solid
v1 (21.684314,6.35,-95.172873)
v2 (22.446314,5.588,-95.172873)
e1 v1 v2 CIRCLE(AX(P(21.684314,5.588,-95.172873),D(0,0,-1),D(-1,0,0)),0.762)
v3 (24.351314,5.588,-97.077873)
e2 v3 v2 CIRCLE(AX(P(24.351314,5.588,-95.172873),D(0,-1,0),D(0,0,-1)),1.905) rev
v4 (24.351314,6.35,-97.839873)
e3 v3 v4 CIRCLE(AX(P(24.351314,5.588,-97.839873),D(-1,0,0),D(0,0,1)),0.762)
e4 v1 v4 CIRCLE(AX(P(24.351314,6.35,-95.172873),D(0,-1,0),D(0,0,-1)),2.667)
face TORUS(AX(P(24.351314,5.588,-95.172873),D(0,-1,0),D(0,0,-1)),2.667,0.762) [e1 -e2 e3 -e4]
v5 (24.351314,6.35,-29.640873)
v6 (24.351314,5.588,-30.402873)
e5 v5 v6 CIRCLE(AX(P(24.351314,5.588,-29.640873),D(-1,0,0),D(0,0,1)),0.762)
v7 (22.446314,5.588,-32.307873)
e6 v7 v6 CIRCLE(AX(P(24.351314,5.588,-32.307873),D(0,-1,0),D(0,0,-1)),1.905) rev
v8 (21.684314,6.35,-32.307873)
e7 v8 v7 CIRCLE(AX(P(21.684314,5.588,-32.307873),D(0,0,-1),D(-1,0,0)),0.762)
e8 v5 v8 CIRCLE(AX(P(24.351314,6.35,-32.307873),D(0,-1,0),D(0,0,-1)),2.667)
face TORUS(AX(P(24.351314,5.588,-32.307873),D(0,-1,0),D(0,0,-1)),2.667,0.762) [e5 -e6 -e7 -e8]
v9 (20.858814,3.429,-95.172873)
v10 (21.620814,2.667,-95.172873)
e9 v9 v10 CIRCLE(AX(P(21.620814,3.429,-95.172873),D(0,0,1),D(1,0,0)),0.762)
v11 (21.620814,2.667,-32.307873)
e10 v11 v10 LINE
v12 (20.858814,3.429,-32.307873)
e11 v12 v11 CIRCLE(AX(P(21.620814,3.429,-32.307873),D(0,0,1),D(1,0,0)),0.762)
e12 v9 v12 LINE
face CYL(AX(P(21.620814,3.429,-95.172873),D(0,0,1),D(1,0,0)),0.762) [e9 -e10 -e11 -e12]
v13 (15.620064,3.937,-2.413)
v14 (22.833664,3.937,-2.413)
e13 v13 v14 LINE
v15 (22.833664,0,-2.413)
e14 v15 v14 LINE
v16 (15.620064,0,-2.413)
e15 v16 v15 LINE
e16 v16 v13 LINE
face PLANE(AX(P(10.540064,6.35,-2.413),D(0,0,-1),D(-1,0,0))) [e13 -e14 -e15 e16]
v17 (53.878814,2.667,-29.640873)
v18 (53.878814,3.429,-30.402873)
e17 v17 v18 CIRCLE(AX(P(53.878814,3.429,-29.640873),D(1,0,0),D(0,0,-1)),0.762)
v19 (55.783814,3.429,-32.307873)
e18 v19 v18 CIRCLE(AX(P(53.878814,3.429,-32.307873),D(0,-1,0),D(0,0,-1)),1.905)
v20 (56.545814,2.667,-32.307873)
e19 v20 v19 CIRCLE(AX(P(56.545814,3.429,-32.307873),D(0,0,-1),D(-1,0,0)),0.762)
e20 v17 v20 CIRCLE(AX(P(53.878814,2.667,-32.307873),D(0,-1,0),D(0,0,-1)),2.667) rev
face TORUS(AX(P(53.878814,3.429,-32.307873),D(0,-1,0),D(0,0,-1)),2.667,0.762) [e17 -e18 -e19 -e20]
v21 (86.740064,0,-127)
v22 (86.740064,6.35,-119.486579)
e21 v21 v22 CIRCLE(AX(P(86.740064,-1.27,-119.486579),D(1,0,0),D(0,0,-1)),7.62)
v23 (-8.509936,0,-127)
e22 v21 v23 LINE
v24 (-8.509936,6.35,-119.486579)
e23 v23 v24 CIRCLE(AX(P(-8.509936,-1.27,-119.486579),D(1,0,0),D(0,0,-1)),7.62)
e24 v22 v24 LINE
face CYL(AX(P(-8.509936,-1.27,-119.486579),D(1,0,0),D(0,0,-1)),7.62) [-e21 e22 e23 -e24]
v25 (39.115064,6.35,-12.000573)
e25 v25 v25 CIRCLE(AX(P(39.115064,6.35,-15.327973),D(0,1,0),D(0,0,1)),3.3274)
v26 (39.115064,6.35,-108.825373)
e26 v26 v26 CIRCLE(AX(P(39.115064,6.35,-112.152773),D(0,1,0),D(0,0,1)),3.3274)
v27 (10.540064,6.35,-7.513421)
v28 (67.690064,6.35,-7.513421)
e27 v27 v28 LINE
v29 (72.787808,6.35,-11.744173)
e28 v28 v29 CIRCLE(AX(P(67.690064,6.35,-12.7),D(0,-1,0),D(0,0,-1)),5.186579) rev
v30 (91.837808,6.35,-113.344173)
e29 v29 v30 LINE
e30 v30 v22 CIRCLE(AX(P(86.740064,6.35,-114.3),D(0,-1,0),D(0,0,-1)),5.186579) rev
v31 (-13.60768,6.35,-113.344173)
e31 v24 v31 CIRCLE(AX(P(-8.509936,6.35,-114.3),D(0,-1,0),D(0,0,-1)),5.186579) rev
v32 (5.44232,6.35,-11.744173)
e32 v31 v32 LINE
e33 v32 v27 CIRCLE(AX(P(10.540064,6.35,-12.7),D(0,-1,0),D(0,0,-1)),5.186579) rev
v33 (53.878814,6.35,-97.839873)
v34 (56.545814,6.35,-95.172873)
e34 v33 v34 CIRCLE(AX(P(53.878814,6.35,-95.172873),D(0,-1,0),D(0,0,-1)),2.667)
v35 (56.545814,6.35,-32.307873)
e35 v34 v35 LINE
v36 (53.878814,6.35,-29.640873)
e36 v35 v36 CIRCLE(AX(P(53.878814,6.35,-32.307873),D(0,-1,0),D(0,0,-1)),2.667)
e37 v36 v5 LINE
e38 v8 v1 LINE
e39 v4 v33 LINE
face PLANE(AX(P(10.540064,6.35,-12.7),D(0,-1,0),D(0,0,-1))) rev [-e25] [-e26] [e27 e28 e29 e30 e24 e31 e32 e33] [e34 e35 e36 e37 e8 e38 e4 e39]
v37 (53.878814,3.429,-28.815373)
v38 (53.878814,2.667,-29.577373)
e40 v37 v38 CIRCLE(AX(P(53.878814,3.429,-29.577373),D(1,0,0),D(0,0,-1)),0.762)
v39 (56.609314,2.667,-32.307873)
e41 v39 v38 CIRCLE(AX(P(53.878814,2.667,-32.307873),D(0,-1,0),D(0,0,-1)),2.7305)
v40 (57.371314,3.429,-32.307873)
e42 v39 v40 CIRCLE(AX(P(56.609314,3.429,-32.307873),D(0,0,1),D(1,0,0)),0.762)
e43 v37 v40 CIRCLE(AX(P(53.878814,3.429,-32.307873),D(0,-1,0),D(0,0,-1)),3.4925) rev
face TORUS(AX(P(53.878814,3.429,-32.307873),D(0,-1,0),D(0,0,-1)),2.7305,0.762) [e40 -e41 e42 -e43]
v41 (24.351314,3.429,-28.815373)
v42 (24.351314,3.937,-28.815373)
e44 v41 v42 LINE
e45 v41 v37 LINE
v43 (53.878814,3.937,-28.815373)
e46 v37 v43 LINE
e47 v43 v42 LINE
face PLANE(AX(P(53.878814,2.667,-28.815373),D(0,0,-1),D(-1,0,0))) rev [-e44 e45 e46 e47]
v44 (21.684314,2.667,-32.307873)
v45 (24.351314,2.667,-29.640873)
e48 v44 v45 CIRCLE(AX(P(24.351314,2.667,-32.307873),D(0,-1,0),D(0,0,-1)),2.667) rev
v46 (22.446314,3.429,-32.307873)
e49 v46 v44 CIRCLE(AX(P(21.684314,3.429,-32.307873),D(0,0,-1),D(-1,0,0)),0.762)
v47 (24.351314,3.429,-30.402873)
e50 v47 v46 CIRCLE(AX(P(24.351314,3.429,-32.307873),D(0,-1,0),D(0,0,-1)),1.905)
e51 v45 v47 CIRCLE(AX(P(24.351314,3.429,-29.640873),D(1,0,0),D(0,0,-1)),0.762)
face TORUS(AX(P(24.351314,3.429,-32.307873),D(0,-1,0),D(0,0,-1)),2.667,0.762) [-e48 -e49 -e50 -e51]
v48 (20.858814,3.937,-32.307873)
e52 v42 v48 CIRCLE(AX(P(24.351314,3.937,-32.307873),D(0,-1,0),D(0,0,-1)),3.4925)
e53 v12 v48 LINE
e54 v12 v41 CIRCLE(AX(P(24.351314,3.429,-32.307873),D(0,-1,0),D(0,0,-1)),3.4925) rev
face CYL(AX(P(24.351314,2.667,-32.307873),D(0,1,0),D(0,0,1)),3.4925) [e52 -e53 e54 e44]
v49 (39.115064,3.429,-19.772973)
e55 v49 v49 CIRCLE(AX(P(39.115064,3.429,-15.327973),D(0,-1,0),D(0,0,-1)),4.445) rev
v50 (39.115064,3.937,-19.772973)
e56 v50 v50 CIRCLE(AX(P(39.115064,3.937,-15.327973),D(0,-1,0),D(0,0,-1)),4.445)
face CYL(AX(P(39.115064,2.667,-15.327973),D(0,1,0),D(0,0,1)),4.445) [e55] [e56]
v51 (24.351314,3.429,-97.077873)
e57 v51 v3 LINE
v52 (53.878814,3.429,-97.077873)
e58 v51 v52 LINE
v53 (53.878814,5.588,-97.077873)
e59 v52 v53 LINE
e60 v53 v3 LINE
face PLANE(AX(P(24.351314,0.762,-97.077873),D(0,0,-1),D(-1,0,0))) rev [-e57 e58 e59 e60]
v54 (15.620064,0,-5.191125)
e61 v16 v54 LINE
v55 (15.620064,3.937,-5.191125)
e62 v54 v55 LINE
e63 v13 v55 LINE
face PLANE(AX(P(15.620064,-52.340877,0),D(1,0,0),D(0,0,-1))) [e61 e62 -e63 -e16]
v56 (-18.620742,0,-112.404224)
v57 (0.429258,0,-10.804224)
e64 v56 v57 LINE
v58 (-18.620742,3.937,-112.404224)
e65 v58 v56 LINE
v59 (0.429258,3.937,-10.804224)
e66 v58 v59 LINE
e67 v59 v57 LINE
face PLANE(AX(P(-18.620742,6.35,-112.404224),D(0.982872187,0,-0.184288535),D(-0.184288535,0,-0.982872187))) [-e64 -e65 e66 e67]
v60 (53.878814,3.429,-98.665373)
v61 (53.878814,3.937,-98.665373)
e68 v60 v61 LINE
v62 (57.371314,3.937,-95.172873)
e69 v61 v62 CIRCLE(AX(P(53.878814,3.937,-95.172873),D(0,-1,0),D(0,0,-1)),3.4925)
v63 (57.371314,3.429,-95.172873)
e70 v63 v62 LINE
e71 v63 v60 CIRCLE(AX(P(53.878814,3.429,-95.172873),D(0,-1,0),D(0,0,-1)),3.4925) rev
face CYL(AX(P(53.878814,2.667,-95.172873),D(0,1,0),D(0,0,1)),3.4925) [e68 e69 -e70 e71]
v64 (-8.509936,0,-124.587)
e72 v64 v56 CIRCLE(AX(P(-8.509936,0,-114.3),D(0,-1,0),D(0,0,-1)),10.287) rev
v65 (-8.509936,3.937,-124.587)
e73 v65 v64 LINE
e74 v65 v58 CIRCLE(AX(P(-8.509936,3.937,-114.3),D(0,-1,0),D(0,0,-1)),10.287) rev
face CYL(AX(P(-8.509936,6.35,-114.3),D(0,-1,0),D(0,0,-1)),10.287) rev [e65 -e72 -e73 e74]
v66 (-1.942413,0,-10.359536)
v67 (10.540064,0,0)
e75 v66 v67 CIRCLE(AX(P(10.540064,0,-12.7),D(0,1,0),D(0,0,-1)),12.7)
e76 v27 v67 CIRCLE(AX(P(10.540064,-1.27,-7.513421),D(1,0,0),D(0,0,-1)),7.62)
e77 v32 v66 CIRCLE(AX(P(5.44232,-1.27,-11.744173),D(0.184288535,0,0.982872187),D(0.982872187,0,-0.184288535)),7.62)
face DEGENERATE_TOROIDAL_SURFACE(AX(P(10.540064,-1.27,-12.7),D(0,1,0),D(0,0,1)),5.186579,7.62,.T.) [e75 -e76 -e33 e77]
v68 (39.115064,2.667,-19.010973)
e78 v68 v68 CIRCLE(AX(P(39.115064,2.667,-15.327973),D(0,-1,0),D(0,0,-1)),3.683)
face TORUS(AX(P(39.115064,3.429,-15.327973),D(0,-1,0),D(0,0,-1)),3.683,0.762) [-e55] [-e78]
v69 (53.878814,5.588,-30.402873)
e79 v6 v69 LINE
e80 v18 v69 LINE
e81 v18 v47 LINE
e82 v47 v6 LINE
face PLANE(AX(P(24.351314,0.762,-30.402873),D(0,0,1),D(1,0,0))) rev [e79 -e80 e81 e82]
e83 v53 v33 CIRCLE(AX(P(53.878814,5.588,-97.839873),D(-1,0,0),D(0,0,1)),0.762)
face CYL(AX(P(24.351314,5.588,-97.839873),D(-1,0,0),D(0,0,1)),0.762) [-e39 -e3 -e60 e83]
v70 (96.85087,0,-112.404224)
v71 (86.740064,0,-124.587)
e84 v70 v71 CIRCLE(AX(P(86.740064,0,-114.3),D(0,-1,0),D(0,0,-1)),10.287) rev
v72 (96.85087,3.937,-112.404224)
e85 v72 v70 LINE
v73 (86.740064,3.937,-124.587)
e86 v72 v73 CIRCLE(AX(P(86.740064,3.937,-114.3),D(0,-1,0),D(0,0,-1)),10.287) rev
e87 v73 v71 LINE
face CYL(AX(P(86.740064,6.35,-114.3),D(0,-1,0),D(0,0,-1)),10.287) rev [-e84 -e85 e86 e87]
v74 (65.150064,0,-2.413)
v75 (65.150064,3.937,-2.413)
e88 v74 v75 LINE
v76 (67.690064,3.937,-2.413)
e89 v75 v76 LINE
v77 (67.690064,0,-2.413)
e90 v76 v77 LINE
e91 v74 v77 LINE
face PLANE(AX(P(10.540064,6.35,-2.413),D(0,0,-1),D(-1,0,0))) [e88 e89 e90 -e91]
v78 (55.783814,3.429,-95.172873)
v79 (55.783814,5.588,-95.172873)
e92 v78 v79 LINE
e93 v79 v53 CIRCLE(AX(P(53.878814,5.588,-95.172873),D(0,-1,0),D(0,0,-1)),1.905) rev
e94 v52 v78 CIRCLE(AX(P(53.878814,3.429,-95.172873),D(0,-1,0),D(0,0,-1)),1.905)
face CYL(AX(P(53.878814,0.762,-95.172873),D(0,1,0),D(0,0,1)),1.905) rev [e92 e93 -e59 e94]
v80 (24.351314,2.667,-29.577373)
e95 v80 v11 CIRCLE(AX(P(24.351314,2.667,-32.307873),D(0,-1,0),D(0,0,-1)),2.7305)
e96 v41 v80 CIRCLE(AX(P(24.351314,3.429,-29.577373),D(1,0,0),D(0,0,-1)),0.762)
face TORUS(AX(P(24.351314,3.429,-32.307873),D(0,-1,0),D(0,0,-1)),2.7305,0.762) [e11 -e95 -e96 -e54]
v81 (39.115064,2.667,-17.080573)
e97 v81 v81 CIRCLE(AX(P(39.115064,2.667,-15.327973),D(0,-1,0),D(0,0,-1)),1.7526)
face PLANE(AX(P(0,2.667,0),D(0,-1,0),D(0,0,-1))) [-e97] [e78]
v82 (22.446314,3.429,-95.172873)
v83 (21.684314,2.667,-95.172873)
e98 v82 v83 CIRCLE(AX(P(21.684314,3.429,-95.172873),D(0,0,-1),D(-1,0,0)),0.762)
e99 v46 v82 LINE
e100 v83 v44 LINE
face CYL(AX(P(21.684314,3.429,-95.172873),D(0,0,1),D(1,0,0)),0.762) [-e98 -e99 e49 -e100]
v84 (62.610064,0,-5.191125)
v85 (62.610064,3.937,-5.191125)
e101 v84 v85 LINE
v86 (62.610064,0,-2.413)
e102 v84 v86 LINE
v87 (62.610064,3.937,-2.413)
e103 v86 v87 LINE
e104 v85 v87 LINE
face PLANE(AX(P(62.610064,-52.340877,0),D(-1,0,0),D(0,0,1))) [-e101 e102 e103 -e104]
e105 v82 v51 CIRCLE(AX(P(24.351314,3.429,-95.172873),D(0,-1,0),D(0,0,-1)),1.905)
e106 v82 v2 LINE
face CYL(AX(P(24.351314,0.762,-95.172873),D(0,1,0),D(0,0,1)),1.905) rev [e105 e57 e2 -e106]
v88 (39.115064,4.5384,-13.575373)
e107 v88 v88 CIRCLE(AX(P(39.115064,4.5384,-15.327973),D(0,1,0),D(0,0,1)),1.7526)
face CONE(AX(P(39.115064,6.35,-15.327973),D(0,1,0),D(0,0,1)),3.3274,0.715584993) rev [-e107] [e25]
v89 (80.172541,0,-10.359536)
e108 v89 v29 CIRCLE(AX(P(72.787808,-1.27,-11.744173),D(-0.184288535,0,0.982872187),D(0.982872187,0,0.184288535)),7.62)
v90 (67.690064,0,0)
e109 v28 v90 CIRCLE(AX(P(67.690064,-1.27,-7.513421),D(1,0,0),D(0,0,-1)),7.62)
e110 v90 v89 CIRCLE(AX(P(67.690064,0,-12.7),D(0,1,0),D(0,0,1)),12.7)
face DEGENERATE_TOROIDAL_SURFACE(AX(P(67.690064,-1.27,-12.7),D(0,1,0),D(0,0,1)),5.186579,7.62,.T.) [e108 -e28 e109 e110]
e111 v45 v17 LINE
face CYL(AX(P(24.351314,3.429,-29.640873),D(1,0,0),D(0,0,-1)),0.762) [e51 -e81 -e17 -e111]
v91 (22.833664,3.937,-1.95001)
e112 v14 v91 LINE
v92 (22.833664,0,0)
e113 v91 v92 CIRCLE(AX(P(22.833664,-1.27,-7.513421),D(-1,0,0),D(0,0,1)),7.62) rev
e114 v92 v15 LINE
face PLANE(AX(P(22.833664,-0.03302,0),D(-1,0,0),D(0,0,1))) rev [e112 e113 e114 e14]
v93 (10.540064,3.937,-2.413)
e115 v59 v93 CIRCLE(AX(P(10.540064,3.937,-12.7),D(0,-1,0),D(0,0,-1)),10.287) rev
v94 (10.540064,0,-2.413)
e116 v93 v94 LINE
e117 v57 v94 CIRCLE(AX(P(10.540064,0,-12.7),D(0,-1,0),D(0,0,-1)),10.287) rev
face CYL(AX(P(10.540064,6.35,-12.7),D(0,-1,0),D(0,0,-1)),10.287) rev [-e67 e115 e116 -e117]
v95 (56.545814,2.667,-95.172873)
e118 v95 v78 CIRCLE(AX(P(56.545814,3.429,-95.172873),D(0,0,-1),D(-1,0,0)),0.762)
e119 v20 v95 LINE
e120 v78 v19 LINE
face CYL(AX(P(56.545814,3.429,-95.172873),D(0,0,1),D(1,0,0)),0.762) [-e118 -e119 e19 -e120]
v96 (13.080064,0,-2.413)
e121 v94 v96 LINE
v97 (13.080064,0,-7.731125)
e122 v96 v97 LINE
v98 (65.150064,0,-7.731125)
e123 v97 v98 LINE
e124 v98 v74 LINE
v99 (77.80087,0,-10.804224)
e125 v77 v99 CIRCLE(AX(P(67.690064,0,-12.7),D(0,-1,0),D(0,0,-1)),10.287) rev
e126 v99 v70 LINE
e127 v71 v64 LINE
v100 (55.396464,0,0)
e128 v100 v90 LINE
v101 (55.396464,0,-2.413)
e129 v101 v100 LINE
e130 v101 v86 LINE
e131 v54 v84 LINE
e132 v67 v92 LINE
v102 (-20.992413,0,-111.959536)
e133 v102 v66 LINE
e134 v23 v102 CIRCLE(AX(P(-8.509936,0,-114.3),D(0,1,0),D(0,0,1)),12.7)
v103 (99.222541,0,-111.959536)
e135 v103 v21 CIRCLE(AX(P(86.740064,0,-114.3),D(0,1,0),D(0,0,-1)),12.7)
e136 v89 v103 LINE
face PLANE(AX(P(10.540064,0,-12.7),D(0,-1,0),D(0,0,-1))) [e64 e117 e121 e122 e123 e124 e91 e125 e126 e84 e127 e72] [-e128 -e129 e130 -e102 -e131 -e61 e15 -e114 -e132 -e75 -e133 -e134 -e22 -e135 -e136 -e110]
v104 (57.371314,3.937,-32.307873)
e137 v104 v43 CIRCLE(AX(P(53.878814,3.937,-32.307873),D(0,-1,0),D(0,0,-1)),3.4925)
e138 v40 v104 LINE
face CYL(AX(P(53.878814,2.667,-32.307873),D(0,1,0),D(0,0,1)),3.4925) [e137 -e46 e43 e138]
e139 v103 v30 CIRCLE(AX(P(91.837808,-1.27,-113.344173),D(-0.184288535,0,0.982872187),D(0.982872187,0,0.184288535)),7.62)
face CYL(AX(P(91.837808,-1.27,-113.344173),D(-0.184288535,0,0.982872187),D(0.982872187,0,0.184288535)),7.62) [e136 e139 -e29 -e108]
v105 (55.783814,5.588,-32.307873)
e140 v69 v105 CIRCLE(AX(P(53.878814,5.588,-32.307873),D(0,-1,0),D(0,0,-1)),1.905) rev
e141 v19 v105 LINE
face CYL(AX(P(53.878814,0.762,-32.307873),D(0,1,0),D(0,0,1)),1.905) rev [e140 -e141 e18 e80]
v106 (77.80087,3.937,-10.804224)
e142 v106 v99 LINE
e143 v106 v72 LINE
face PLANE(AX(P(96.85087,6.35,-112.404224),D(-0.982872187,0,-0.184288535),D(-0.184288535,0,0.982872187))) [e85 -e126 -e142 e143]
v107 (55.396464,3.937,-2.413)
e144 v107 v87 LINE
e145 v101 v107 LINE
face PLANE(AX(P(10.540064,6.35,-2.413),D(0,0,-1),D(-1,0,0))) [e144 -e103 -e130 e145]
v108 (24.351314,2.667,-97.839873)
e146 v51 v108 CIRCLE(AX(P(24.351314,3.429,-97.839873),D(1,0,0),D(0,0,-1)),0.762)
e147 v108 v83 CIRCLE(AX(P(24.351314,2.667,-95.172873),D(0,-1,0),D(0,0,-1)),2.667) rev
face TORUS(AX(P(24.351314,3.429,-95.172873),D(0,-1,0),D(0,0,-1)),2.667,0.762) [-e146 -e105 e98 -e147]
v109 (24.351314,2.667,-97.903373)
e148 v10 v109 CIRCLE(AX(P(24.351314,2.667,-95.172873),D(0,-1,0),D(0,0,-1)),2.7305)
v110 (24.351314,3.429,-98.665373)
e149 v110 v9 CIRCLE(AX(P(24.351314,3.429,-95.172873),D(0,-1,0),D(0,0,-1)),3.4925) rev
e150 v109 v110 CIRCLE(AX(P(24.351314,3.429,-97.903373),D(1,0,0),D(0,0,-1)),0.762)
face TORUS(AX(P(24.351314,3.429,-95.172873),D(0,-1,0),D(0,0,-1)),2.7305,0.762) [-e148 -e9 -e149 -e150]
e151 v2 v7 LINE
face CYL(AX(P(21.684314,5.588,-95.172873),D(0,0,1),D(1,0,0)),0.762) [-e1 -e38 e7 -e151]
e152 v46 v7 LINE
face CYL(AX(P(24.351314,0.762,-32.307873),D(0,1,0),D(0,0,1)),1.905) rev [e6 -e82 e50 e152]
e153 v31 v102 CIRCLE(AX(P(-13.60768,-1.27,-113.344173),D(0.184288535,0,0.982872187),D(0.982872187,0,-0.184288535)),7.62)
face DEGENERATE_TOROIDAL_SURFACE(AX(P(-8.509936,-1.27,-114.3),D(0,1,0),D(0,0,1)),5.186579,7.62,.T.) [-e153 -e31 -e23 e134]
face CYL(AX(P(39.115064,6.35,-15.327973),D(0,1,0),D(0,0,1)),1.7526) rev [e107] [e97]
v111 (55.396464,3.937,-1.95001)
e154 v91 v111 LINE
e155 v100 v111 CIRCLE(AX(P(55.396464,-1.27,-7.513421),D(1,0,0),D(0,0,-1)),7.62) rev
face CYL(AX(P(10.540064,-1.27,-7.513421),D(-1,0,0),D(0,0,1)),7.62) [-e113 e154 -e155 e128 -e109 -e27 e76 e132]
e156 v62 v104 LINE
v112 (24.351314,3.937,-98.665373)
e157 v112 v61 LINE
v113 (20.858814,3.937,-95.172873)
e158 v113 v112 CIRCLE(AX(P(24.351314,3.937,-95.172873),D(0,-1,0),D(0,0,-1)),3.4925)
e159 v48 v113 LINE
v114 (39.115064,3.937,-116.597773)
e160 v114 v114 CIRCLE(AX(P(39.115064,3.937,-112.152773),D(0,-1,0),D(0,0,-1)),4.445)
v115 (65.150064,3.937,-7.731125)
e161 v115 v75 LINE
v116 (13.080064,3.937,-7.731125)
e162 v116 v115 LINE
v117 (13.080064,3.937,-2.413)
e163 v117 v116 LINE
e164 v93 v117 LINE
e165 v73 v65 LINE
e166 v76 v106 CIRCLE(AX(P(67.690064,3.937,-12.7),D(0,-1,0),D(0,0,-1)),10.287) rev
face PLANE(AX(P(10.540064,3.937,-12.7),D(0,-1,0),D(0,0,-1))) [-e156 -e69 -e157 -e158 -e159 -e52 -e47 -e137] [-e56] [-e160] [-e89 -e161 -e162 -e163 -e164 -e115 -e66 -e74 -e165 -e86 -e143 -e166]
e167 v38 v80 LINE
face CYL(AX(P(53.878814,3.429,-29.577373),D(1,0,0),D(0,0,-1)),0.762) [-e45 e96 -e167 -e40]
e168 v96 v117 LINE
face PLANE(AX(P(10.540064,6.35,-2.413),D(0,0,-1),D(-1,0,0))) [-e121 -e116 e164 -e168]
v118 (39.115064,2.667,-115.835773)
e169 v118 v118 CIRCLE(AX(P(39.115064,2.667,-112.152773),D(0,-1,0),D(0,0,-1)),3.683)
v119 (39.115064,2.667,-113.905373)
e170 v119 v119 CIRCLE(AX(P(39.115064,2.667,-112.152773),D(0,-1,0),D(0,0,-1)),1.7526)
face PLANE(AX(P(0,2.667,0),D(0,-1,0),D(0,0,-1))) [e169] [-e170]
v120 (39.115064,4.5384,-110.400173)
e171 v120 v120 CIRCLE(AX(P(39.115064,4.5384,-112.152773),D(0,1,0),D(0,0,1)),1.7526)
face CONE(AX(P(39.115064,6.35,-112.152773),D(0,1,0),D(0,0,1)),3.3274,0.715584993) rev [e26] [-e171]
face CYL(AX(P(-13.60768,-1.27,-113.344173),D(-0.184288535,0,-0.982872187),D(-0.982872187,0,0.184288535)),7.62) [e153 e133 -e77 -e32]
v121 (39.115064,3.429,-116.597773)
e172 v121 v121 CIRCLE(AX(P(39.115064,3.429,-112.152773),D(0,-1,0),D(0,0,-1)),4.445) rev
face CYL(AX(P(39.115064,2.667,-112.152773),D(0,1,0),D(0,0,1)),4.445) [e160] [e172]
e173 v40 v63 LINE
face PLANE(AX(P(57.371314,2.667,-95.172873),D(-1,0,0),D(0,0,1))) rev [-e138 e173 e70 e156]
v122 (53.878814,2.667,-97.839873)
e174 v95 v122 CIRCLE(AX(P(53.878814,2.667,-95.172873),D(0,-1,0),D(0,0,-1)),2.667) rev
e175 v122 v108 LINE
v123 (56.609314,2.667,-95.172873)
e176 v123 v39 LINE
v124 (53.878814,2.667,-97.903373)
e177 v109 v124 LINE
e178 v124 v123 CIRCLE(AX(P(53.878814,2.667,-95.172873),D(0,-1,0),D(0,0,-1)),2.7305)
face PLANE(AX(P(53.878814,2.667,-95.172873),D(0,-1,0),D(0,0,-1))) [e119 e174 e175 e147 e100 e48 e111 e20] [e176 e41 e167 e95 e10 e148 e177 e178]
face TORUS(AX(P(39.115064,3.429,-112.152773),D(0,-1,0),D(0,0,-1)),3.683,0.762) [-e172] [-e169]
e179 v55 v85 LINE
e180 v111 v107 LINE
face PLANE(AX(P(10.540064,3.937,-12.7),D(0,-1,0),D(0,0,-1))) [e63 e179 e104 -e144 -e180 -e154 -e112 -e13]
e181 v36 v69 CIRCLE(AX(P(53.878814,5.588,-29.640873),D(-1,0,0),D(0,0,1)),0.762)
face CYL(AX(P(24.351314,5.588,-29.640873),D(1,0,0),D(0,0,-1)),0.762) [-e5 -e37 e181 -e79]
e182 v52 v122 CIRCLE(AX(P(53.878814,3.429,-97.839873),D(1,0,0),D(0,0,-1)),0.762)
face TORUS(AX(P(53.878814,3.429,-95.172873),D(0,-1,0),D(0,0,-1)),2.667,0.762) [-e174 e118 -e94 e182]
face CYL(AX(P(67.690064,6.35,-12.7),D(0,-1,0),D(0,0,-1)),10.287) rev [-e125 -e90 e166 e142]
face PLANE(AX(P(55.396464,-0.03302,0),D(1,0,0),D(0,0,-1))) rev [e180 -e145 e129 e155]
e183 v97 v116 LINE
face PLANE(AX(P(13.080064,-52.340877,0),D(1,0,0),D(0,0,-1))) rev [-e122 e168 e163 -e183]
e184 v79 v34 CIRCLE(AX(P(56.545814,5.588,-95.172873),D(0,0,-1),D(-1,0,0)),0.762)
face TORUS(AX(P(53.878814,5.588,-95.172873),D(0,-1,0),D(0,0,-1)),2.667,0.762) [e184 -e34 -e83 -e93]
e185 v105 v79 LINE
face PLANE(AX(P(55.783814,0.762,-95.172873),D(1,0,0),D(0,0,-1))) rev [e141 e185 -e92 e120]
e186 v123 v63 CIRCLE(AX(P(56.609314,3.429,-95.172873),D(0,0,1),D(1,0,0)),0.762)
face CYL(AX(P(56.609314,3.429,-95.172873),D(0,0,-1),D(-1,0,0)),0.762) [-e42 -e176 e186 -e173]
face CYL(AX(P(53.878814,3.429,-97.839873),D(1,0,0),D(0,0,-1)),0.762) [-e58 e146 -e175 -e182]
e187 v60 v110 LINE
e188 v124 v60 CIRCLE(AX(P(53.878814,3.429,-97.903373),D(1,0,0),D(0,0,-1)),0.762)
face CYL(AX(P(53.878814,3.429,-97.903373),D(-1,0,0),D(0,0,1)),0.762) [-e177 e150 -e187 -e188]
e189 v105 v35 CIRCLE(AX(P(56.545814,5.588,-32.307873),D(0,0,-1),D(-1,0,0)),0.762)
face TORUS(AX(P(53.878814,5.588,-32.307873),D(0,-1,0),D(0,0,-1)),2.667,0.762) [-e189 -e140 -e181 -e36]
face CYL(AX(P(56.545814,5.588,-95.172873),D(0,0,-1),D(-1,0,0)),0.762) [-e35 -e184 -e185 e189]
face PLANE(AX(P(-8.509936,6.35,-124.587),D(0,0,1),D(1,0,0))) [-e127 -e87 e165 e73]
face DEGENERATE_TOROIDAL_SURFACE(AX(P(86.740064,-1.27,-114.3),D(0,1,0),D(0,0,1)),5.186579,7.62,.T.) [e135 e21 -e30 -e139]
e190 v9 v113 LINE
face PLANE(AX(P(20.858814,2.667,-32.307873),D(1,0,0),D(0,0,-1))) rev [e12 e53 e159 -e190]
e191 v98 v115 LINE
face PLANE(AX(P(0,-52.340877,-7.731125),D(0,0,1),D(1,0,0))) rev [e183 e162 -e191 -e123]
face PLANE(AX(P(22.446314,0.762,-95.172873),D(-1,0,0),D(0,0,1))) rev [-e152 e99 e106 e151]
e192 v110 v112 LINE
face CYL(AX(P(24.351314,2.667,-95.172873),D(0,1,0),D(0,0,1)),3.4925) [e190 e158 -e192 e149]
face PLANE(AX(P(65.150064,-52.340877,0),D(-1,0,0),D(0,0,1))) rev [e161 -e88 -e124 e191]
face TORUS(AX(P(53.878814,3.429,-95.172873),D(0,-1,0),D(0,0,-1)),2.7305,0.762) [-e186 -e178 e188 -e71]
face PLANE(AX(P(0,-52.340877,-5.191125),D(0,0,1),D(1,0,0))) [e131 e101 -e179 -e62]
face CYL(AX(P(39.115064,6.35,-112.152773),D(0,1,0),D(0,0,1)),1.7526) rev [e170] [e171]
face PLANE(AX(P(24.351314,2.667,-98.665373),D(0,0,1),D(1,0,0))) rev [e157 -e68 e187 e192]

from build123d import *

# Parameters (mm, degrees)
BOSS_EXTRUDE1_DEPTH                               = 6.35
SHELL1_T                                          = -2.413
FILLET1_R                                         = 7.62
SKETCH4_R                                         = 4.445
BOSS_EXTRUDE2_DEPTH                               = 1.27
CSK_FOR_3_FLAT_HEAD_MACHINE_SCREW_100_D           = 3.5052
CSK_FOR_3_FLAT_HEAD_MACHINE_SCREW_100_CSINK_D     = 6.6548
CSK_FOR_3_FLAT_HEAD_MACHINE_SCREW_100_CSINK_ANGLE = 82
CUT_EXTRUDE3_DEPTH                                = 5.588
SKETCH9_W                                         = 32.5628
SKETCH9_H                                         = 2.413
CUT_EXTRUDE4_DEPTH                                = 3.97002
BOSS_EXTRUDE3_DEPTH                               = 3.937
BOSS_EXTRUDE4_DEPTH                               = 1.27
CUT_EXTRUDE5_DEPTH                                = 162.42381732
FILLET2_R                                         = 0.762


with BuildPart() as part:
    # Sketch1 → Boss-Extrude1 (new body)
    with BuildSketch(Plane(origin=(0, 0, 0), x_dir=(1, 0, 0), z_dir=(0, 1, 0))):
        with BuildLine():
            Line((-20.992412926, 111.959535605), (-1.942412926, 10.359535605))
            ThreePointArc((-1.942412926, 10.359535605), (2.429388717, 2.927234327), (10.540063848, 0))
            Line((10.540063848, 0), (67.690063848, 0))
            ThreePointArc((67.690063848, 0), (75.80073898, 2.927234327), (80.172540622, 10.359535605))
            Line((80.172540622, 10.359535605), (99.222540622, 111.959535605))
            ThreePointArc((99.222540622, 111.959535605), (96.512829522, 122.410675132), (86.740063848, 127))
            Line((86.740063848, 127), (-8.509936152, 127))
            ThreePointArc((-8.509936152, 127), (-18.282701825, 122.410675132), (-20.992412926, 111.959535605))
        make_face()
    extrude(amount=BOSS_EXTRUDE1_DEPTH)

    # Shell1
    shell1_openings = [part.faces().sort_by_distance(p)[0] for p in [
        (39.115063848, 0, -68.214548016),
    ]]
    offset(amount=SHELL1_T, openings=shell1_openings, kind=Kind.INTERSECTION)

    # Fillet1
    # the kernel refuses this fillet: 7.62 mm, written as the material it takes off along each edge
    with BuildSketch(Plane(origin=(67.690063848, 6.35, -12.7), x_dir=(0, 0, 1), z_dir=(-1, 0, 0))) as fillet1_piece_1:
        with BuildLine():
            CenterArc((5.186578675, -7.62), FILLET1_R, 9.594068227, 80.405931773)
            Line((5.186578675, 0), (5.186578675, 0.1524))
            Line((5.186578675, 0.1524), (12.7, 0.1524))
            Line((12.7, 0.1524), (12.8524, 0))
            ThreePointArc((12.8524, 0), (12.8524, -3.175), (12.850268426, -6.3246))
            Line((12.850268426, -6.3246), (12.7, -6.35))
        make_face()
    revolve(axis=Axis((67.690063848, 6.35, -12.7), (0, 1, 0)), revolution_arc=79.380344724, mode=Mode.SUBTRACT)
    with BuildSketch(Plane(origin=(10.540063848, 6.35, 0), x_dir=(0, -1, 0), z_dir=(1, 0, 0))) as fillet1_piece_2:
        with BuildLine():
            CenterArc((7.62, 7.513421325), FILLET1_R, 180, 80.405931773)
            Line((0, 7.513421325), (-0.1524, 7.513421325))
            Line((-0.1524, 7.513421325), (-0.1524, 0))
            Line((-0.1524, 0), (0, -0.1524))
            ThreePointArc((0, -0.1524), (3.175, -0.1524), (6.3246, -0.150268426))
            Line((6.3246, -0.150268426), (6.35, 0))
        make_face()
    extrude(amount=57.15, mode=Mode.SUBTRACT)
    with BuildSketch(Plane(origin=(10.540063848, 6.35, -12.7), x_dir=(-0.9828721869343217, 0, 0.18428853505018647), z_dir=(-0.18428853505018647, 0, -0.9828721869343217))) as fillet1_piece_3:
        with BuildLine():
            CenterArc((5.186578675, -7.62), FILLET1_R, 9.594068227, 80.405931773)
            Line((5.186578675, 0), (5.186578675, 0.1524))
            Line((5.186578675, 0.1524), (12.7, 0.1524))
            Line((12.7, 0.1524), (12.8524, 0))
            ThreePointArc((12.8524, 0), (12.8524, -3.175), (12.850268426, -6.3246))
            Line((12.850268426, -6.3246), (12.7, -6.35))
        make_face()
    revolve(axis=Axis((10.540063848, 6.35, -12.7), (0, 1, 0)), revolution_arc=79.380344724, mode=Mode.SUBTRACT)
    with BuildSketch(Plane(origin=(-20.992412926, 6.35, -111.959535605), x_dir=(0, -1, 0), z_dir=(0.18428853505018555, 0, 0.982872186934322)), Plane(origin=(80.172540622, 6.35, -10.359535605), x_dir=(0, -1, 0), z_dir=(0.18428853505018533, 0, -0.982872186934322))) as fillet1_piece_4:
        with BuildLine():
            CenterArc((7.62, 7.513421325), FILLET1_R, 180, 80.405931773)
            Line((0, 7.513421325), (-0.1524, 7.513421325))
            Line((-0.1524, 7.513421325), (-0.1524, 0))
            Line((-0.1524, 0), (0, -0.1524))
            ThreePointArc((0, -0.1524), (3.175, -0.1524), (6.3246, -0.150268426))
            Line((6.3246, -0.150268426), (6.35, 0))
        make_face()
    extrude(amount=103.370510785, mode=Mode.SUBTRACT)
    with BuildSketch(Plane(origin=(-8.509936152, 6.35, -114.3), x_dir=(0, 0, -1), z_dir=(1, 0, 0))) as fillet1_piece_5:
        with BuildLine():
            CenterArc((5.186578675, -7.62), FILLET1_R, 9.594068227, 80.405931773)
            Line((5.186578675, 0), (5.186578675, 0.1524))
            Line((5.186578675, 0.1524), (12.7, 0.1524))
            Line((12.7, 0.1524), (12.8524, 0))
            ThreePointArc((12.8524, 0), (12.8524, -3.175), (12.850268426, -6.3246))
            Line((12.850268426, -6.3246), (12.7, -6.35))
        make_face()
    revolve(axis=Axis((-8.509936152, 6.35, -114.3), (0, 1, 0)), revolution_arc=100.619655276, mode=Mode.SUBTRACT)
    with BuildSketch(Plane(origin=(86.740063848, 6.35, -127), x_dir=(0, -1, 0), z_dir=(-1, 0, 0))) as fillet1_piece_6:
        with BuildLine():
            CenterArc((7.62, 7.513421325), FILLET1_R, 180, 80.405931773)
            Line((0, 7.513421325), (-0.1524, 7.513421325))
            Line((-0.1524, 7.513421325), (-0.1524, 0))
            Line((-0.1524, 0), (0, -0.1524))
            ThreePointArc((0, -0.1524), (3.175, -0.1524), (6.3246, -0.150268426))
            Line((6.3246, -0.150268426), (6.35, 0))
        make_face()
    extrude(amount=95.25, mode=Mode.SUBTRACT)
    with BuildSketch(Plane(origin=(86.740063848, 6.35, -114.3), x_dir=(0.9828721869343223, 0, 0.18428853505018347), z_dir=(-0.18428853505018347, 0, 0.9828721869343223))) as fillet1_piece_7:
        with BuildLine():
            CenterArc((5.186578675, -7.62), FILLET1_R, 9.594068227, 80.405931773)
            Line((5.186578675, 0), (5.186578675, 0.1524))
            Line((5.186578675, 0.1524), (12.7, 0.1524))
            Line((12.7, 0.1524), (12.8524, 0))
            ThreePointArc((12.8524, 0), (12.8524, -3.175), (12.850268426, -6.3246))
            Line((12.850268426, -6.3246), (12.7, -6.35))
        make_face()
    revolve(axis=Axis((86.740063848, 6.35, -114.3), (0, 1, 0)), revolution_arc=100.619655276, mode=Mode.SUBTRACT)

    # Sketch4 → Boss-Extrude2 (add)
    with BuildSketch(Plane.XZ.offset(-3.937)):
        with Locations(Location((39.115063848, -112.152772571, 0), (0, 0, 270))):
            Circle(SKETCH4_R)
        with Locations(Location((39.115063848, -15.327972571, 0), (0, 0, 270))):
            Circle(SKETCH4_R)
    extrude(amount=BOSS_EXTRUDE2_DEPTH)

    # CSK for #3 Flat Head Machine Screw (100)1 (through all)
    with Locations(Plane(origin=(39.115063848, 6.35, -112.152772571), x_dir=(0, 0, 1), z_dir=(0, 1, 0))):
        with Locations((0, 0), (96.8248, 0)):
            CounterSinkHole(CSK_FOR_3_FLAT_HEAD_MACHINE_SCREW_100_D / 2, CSK_FOR_3_FLAT_HEAD_MACHINE_SCREW_100_CSINK_D / 2, counter_sink_angle=CSK_FOR_3_FLAT_HEAD_MACHINE_SCREW_100_CSINK_ANGLE)

    # Sketch8 → Cut-Extrude3 (cut)
    with BuildSketch(Plane(origin=(0, 6.35, 0), x_dir=(1, 0, 0), z_dir=(0, 1, 0))):
        with BuildLine():
            Line((24.351313848, 97.077872571), (53.878813848, 97.077872571))
            ThreePointArc((53.878813848, 97.077872571), (55.225852266, 96.519910989), (55.783813848, 95.172872571))
            Line((55.783813848, 95.172872571), (55.783813848, 32.307872571))
            ThreePointArc((55.783813848, 32.307872571), (55.225852266, 30.960834153), (53.878813848, 30.402872571))
            Line((53.878813848, 30.402872571), (24.351313848, 30.402872571))
            ThreePointArc((24.351313848, 30.402872571), (23.00427543, 30.960834153), (22.446313848, 32.307872571))
            Line((22.446313848, 32.307872571), (22.446313848, 95.172872571))
            ThreePointArc((22.446313848, 95.172872571), (23.00427543, 96.519910989), (24.351313848, 97.077872571))
        make_face()
    extrude(amount=-CUT_EXTRUDE3_DEPTH, mode=Mode.SUBTRACT)

    # Sketch9 → Cut-Extrude4 (cut)
    with BuildSketch(Plane.XZ.offset(-3.937)):
        with Locations((39.115063848, -1.2065)):
            Rectangle(SKETCH9_W, SKETCH9_H)
    extrude(amount=CUT_EXTRUDE4_DEPTH, mode=Mode.SUBTRACT)

    # Sketch9<3> → Boss-Extrude3 (add)
    with BuildSketch(Plane.XZ.offset(-3.937)):
        Polygon((15.620063848, -2.413), (13.080063848, -2.413), (13.080063848, -7.731125), (39.115063848, -7.731125), (39.115063848, -5.191125), (15.620063848, -5.191125), align=None)
        Polygon((39.115063848, -5.191125), (39.115063848, -7.731125), (65.150063848, -7.731125), (65.150063848, -2.413), (62.610063848, -2.413), (62.610063848, -5.191125), align=None)
    extrude(amount=BOSS_EXTRUDE3_DEPTH)

    # Sketch10 → Boss-Extrude4 (add)
    with BuildSketch(Plane.XZ.offset(-3.937)):
        with BuildLine():
            Line((57.371313848, -95.172872571), (57.371313848, -32.307872571))
            ThreePointArc((57.371313848, -32.307872571), (56.348384281, -29.838302138), (53.878813848, -28.815372571))
            Line((53.878813848, -28.815372571), (24.351313848, -28.815372571))
            ThreePointArc((24.351313848, -28.815372571), (21.881743415, -29.838302138), (20.858813848, -32.307872571))
            Line((20.858813848, -32.307872571), (20.858813848, -95.172872571))
            ThreePointArc((20.858813848, -95.172872571), (21.881743415, -97.642443004), (24.351313848, -98.665372571))
            Line((24.351313848, -98.665372571), (53.878813848, -98.665372571))
            ThreePointArc((53.878813848, -98.665372571), (56.348384281, -97.642443004), (57.371313848, -95.172872571))
        make_face()
    extrude(amount=BOSS_EXTRUDE4_DEPTH)

    # Sketch8<3> → Cut-Extrude5 (cut, through all)
    with BuildSketch(Plane(origin=(0, 6.35, 0), x_dir=(1, 0, 0), z_dir=(0, 1, 0))):
        with BuildLine():
            Line((24.351313848, 97.077872571), (53.878813848, 97.077872571))
            ThreePointArc((53.878813848, 97.077872571), (55.225852266, 96.519910989), (55.783813848, 95.172872571))
            Line((55.783813848, 95.172872571), (55.783813848, 32.307872571))
            ThreePointArc((55.783813848, 32.307872571), (55.225852266, 30.960834153), (53.878813848, 30.402872571))
            Line((53.878813848, 30.402872571), (24.351313848, 30.402872571))
            ThreePointArc((24.351313848, 30.402872571), (23.00427543, 30.960834153), (22.446313848, 32.307872571))
            Line((22.446313848, 32.307872571), (22.446313848, 95.172872571))
            ThreePointArc((22.446313848, 95.172872571), (23.00427543, 96.519910989), (24.351313848, 97.077872571))
        make_face()
    extrude(amount=-CUT_EXTRUDE5_DEPTH, mode=Mode.SUBTRACT)

    # Fillet2
    fillet2_edges = [part.edges().sort_by_distance(p)[0] for p in [
        (56.348384281, 2.667, -97.642443004),
        (57.371313848, 2.667, -63.740372571),
        (56.348384281, 2.667, -29.838302138),
        (39.115063848, 2.667, -28.815372571),
        (21.881743415, 2.667, -29.838302138),
        (20.858813848, 2.667, -63.740372571),
        (21.881743415, 2.667, -97.642443004),
        (39.115063848, 2.667, -98.665372571),
        (39.115063848, 2.667, -30.402872571),
        (55.225852266, 2.667, -30.960834153),
        (55.783813848, 2.667, -63.740372571),
        (55.225852266, 2.667, -96.519910989),
        (39.115063848, 2.667, -97.077872571),
        (23.00427543, 2.667, -96.519910989),
        (22.446313848, 2.667, -63.740372571),
        (23.00427543, 2.667, -30.960834153),
        (39.115063848, 2.667, -107.707772571),
        (39.115063848, 2.667, -10.882972571),
        (23.00427543, 6.35, -30.960834153),
        (39.115063848, 6.35, -30.402872571),
        (55.225852266, 6.35, -30.960834153),
        (55.783813848, 6.35, -63.740372571),
        (55.225852266, 6.35, -96.519910989),
        (39.115063848, 6.35, -97.077872571),
        (23.00427543, 6.35, -96.519910989),
        (22.446313848, 6.35, -63.740372571),
    ]]
    fillet(fillet2_edges, radius=FILLET2_R)


solid = part.part
